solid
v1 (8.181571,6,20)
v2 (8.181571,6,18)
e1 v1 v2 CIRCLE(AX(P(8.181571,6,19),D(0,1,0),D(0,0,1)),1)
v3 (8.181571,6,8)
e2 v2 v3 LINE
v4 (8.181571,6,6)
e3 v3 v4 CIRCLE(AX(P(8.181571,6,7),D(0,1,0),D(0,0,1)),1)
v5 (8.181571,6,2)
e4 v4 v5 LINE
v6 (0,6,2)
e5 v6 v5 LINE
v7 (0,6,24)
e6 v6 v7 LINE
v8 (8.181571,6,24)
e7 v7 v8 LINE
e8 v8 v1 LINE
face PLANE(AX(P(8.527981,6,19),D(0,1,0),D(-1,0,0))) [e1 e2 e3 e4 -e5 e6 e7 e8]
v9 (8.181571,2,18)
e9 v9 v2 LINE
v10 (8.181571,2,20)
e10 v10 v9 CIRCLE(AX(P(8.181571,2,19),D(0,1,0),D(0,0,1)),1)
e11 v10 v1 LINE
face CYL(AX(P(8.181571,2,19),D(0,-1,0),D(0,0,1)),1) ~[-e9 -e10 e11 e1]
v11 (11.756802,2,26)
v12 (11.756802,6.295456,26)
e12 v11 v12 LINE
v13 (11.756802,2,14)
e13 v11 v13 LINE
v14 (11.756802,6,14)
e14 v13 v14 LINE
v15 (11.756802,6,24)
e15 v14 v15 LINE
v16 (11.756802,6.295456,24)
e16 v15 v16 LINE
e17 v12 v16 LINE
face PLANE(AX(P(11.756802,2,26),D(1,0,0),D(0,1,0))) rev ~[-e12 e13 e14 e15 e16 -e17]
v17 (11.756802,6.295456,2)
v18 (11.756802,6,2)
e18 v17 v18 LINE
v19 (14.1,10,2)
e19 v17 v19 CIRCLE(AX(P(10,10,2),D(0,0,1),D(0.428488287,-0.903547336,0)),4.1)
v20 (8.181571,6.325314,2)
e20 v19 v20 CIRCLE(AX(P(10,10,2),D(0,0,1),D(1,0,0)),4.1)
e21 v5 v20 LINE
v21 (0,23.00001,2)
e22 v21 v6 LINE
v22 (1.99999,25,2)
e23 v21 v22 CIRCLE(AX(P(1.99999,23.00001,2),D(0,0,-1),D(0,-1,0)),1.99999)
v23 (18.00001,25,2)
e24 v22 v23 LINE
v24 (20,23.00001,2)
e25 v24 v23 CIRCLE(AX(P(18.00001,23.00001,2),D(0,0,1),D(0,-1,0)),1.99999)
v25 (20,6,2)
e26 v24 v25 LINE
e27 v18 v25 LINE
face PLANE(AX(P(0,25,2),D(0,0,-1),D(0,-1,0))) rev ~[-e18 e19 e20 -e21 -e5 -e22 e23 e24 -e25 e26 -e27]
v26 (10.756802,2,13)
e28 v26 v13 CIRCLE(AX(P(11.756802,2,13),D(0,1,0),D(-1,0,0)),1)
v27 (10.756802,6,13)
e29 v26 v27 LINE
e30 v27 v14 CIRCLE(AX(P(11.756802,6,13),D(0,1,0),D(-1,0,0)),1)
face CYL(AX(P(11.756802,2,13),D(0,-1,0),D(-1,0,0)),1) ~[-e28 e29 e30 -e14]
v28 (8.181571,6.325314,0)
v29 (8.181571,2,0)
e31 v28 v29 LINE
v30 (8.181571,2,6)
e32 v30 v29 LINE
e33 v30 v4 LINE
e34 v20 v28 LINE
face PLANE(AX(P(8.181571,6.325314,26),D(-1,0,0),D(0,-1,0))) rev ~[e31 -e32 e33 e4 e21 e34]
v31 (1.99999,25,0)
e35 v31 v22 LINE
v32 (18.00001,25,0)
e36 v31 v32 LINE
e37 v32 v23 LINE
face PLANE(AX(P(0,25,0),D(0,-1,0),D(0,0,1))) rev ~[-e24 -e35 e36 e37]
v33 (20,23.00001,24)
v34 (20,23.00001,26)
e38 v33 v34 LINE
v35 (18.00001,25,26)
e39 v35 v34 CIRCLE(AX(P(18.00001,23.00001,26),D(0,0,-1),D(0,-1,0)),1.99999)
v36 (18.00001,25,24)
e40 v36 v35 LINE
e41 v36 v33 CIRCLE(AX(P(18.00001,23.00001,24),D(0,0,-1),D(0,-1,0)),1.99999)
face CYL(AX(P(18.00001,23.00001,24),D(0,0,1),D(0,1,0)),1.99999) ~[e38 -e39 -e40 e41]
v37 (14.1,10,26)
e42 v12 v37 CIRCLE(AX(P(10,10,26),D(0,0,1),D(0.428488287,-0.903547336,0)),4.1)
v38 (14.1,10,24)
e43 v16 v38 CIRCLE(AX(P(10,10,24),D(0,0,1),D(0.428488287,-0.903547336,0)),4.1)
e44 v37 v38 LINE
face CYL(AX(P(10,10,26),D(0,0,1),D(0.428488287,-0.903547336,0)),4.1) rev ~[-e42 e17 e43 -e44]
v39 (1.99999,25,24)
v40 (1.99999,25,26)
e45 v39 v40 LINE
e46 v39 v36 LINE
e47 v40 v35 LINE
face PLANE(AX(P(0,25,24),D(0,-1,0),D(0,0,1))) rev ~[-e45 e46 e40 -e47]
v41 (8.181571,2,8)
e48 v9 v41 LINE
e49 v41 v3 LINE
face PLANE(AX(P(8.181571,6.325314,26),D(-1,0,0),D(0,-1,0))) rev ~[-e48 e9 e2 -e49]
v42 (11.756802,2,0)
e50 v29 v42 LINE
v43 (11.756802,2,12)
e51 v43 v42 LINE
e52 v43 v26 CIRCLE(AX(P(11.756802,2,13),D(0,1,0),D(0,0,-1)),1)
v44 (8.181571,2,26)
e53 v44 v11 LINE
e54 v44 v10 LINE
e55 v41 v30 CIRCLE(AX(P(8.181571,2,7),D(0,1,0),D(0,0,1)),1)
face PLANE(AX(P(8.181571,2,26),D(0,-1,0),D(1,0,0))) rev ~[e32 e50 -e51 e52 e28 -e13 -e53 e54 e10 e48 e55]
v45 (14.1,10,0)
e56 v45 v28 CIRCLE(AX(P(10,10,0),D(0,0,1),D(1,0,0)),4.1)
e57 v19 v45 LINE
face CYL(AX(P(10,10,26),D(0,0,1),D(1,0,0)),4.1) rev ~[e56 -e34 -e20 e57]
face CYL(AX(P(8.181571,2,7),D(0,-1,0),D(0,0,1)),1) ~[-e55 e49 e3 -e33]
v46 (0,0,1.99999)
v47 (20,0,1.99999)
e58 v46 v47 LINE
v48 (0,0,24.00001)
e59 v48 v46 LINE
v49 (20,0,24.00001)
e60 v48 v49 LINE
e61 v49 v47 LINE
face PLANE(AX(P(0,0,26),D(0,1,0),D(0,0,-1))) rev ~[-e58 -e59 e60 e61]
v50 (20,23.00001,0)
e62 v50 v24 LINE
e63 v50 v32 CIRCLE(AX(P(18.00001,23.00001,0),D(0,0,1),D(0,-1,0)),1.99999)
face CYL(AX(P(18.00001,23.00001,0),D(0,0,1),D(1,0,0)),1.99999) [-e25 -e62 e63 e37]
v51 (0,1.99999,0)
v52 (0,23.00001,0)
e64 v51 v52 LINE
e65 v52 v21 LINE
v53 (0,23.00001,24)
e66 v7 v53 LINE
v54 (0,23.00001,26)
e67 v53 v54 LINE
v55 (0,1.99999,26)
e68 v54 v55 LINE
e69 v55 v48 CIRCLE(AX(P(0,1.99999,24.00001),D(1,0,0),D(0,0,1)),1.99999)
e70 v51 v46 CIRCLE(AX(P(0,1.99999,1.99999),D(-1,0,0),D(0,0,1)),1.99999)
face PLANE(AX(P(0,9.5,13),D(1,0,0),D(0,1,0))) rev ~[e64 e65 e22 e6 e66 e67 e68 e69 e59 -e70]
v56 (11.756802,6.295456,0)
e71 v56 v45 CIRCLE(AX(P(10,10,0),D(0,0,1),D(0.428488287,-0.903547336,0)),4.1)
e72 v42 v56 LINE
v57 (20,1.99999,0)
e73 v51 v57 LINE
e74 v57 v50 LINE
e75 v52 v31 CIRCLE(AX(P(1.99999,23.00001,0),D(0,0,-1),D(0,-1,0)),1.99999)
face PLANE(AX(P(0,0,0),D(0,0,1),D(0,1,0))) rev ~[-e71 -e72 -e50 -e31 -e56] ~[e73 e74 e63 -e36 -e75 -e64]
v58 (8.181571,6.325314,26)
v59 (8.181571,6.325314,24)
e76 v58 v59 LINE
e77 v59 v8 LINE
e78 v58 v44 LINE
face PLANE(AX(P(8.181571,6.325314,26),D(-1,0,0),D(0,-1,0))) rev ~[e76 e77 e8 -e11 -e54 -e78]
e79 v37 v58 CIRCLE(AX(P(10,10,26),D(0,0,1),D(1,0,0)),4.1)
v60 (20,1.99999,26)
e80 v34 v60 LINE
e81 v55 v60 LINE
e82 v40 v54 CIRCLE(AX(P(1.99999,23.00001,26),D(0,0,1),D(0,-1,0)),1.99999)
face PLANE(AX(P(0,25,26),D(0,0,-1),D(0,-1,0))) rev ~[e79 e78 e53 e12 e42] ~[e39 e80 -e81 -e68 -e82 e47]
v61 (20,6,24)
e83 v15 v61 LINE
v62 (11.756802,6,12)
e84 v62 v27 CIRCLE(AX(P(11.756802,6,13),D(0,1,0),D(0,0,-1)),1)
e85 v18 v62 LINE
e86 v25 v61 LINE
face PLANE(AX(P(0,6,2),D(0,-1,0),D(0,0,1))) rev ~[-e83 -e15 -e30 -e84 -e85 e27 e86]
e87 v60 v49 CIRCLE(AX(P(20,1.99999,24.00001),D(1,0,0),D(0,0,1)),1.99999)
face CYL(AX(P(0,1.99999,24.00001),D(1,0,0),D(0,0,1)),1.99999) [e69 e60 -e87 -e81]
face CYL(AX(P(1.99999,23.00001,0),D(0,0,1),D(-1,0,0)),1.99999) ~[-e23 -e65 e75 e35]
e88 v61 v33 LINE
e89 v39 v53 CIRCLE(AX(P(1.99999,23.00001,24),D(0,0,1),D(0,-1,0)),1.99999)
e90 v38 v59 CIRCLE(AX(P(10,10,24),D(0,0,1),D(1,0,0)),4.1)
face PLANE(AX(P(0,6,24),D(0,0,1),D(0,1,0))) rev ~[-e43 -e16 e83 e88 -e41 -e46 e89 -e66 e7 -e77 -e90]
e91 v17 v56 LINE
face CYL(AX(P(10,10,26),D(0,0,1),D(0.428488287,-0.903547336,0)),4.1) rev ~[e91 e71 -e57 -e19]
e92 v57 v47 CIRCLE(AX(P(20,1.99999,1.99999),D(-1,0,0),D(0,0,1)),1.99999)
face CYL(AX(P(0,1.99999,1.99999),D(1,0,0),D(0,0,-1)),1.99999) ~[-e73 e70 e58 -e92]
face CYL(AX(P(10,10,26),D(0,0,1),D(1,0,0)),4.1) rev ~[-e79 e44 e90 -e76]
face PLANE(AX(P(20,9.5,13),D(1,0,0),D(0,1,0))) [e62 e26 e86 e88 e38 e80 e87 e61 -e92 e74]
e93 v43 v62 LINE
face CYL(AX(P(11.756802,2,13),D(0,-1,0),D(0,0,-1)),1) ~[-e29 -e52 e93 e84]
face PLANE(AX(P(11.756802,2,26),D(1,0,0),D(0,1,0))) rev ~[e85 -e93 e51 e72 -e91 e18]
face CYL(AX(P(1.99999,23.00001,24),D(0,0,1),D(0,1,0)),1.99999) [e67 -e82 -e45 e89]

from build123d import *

# Parameters (mm, degrees)
F0_W     = 4
F0_H     = 18
F1_DEPTH = 20
F3_DEPTH = 30
F5_DEPTH = 4
F6_R     = 1.99999


# Not quite as in the source:
# - a fillet or chamfer is up to 0.001 mm smaller than in the source, because OpenCascade refuses the exact size
# - a feature names something its author has since deleted; it is built from what else it names


with BuildPart() as f1:
    # F0 (on Right) → F1 (new body)
    with BuildSketch(Plane.YZ):
        Polygon((0, 26), (0, 0), (25, 0), (25, 2), (6, 2), (6, 4), (2, 4), (2, 22), (6, 22), (6, 24), (25, 24), (25, 26), align=None)
        with Locations((4, 13)):
            Rectangle(F0_W, F0_H)
    extrude(amount=F1_DEPTH)

    # F2 (on face) → F3 (cut)
    with BuildSketch(Plane.XY.offset(26)):
        with BuildLine():
            ThreePointArc((11.7568019778, 6.295455924), (9.9657604027, 5.900142972), (8.1815710291, 6.3253141525))
            Line((8.1815710291, 6.3253141525), (8.1815710291, 2))
            Line((8.1815710291, 2), (10, 2))
            Line((10, 2), (11.7568019778, 2))
            Line((11.7568019778, 2), (11.7568019778, 6.295455924))
        make_face()
        with BuildLine():
            ThreePointArc((11.7568019778, 6.295455924), (13.4650316094, 7.8082983904), (14.1, 10))
            ThreePointArc((14.1, 10), (7.8373117169, 13.4832139455), (8.1815710291, 6.3253141525))
            ThreePointArc((8.1815710291, 6.3253141525), (9.9657604027, 5.900142972), (11.7568019778, 6.295455924))
        make_face()
    extrude(amount=-F3_DEPTH, mode=Mode.SUBTRACT)

    # F4 (on face) → F5 (join)
    with BuildSketch(Plane(origin=(0, 2, 0), x_dir=(-1, 0, 0), z_dir=(0, 1, 0))):
        with BuildLine():
            ThreePointArc((-11.7568019778, 12), (-11.0496951966, 12.2928932188), (-10.7568019778, 13))
            ThreePointArc((-10.7568019778, 13), (-11.0496951966, 13.7071067812), (-11.7568019778, 14))
            Line((-11.7568019778, 14), (-11.7568019778, 12))
        make_face()
        with BuildLine():
            Line((-8.1815710291, 18), (-8.1815710291, 20))
            ThreePointArc((-8.1815710291, 20), (-9.1815710291, 19), (-8.1815710291, 18))
        make_face()
        with BuildLine():
            ThreePointArc((-7.1815710291, 19), (-7.4744642479, 19.7071067812), (-8.1815710291, 20))
            Line((-8.1815710291, 20), (-8.1815710291, 18))
            ThreePointArc((-8.1815710291, 18), (-7.4744642479, 18.2928932188), (-7.1815710291, 19))
        make_face()
        with BuildLine():
            ThreePointArc((-8.1815710291, 8), (-9.1815710291, 7), (-8.1815710291, 6))
            Line((-8.1815710291, 6), (-8.1815710291, 8))
        make_face()
    extrude(amount=F5_DEPTH)

    # F6 (radius 2 in the source; OpenCascade refuses exactly that, so slightly less here)
    f6_edges = [f1.edges().sort_by_distance(p)[0] for p in [
        (10, 0, 26),
        (10, 0, 0),
        (20, 25, 1),
        (0, 25, 1),
        (0, 25, 25),
        (20, 25, 25),
    ]]
    fillet(f6_edges, radius=F6_R)


solid = f1.part
